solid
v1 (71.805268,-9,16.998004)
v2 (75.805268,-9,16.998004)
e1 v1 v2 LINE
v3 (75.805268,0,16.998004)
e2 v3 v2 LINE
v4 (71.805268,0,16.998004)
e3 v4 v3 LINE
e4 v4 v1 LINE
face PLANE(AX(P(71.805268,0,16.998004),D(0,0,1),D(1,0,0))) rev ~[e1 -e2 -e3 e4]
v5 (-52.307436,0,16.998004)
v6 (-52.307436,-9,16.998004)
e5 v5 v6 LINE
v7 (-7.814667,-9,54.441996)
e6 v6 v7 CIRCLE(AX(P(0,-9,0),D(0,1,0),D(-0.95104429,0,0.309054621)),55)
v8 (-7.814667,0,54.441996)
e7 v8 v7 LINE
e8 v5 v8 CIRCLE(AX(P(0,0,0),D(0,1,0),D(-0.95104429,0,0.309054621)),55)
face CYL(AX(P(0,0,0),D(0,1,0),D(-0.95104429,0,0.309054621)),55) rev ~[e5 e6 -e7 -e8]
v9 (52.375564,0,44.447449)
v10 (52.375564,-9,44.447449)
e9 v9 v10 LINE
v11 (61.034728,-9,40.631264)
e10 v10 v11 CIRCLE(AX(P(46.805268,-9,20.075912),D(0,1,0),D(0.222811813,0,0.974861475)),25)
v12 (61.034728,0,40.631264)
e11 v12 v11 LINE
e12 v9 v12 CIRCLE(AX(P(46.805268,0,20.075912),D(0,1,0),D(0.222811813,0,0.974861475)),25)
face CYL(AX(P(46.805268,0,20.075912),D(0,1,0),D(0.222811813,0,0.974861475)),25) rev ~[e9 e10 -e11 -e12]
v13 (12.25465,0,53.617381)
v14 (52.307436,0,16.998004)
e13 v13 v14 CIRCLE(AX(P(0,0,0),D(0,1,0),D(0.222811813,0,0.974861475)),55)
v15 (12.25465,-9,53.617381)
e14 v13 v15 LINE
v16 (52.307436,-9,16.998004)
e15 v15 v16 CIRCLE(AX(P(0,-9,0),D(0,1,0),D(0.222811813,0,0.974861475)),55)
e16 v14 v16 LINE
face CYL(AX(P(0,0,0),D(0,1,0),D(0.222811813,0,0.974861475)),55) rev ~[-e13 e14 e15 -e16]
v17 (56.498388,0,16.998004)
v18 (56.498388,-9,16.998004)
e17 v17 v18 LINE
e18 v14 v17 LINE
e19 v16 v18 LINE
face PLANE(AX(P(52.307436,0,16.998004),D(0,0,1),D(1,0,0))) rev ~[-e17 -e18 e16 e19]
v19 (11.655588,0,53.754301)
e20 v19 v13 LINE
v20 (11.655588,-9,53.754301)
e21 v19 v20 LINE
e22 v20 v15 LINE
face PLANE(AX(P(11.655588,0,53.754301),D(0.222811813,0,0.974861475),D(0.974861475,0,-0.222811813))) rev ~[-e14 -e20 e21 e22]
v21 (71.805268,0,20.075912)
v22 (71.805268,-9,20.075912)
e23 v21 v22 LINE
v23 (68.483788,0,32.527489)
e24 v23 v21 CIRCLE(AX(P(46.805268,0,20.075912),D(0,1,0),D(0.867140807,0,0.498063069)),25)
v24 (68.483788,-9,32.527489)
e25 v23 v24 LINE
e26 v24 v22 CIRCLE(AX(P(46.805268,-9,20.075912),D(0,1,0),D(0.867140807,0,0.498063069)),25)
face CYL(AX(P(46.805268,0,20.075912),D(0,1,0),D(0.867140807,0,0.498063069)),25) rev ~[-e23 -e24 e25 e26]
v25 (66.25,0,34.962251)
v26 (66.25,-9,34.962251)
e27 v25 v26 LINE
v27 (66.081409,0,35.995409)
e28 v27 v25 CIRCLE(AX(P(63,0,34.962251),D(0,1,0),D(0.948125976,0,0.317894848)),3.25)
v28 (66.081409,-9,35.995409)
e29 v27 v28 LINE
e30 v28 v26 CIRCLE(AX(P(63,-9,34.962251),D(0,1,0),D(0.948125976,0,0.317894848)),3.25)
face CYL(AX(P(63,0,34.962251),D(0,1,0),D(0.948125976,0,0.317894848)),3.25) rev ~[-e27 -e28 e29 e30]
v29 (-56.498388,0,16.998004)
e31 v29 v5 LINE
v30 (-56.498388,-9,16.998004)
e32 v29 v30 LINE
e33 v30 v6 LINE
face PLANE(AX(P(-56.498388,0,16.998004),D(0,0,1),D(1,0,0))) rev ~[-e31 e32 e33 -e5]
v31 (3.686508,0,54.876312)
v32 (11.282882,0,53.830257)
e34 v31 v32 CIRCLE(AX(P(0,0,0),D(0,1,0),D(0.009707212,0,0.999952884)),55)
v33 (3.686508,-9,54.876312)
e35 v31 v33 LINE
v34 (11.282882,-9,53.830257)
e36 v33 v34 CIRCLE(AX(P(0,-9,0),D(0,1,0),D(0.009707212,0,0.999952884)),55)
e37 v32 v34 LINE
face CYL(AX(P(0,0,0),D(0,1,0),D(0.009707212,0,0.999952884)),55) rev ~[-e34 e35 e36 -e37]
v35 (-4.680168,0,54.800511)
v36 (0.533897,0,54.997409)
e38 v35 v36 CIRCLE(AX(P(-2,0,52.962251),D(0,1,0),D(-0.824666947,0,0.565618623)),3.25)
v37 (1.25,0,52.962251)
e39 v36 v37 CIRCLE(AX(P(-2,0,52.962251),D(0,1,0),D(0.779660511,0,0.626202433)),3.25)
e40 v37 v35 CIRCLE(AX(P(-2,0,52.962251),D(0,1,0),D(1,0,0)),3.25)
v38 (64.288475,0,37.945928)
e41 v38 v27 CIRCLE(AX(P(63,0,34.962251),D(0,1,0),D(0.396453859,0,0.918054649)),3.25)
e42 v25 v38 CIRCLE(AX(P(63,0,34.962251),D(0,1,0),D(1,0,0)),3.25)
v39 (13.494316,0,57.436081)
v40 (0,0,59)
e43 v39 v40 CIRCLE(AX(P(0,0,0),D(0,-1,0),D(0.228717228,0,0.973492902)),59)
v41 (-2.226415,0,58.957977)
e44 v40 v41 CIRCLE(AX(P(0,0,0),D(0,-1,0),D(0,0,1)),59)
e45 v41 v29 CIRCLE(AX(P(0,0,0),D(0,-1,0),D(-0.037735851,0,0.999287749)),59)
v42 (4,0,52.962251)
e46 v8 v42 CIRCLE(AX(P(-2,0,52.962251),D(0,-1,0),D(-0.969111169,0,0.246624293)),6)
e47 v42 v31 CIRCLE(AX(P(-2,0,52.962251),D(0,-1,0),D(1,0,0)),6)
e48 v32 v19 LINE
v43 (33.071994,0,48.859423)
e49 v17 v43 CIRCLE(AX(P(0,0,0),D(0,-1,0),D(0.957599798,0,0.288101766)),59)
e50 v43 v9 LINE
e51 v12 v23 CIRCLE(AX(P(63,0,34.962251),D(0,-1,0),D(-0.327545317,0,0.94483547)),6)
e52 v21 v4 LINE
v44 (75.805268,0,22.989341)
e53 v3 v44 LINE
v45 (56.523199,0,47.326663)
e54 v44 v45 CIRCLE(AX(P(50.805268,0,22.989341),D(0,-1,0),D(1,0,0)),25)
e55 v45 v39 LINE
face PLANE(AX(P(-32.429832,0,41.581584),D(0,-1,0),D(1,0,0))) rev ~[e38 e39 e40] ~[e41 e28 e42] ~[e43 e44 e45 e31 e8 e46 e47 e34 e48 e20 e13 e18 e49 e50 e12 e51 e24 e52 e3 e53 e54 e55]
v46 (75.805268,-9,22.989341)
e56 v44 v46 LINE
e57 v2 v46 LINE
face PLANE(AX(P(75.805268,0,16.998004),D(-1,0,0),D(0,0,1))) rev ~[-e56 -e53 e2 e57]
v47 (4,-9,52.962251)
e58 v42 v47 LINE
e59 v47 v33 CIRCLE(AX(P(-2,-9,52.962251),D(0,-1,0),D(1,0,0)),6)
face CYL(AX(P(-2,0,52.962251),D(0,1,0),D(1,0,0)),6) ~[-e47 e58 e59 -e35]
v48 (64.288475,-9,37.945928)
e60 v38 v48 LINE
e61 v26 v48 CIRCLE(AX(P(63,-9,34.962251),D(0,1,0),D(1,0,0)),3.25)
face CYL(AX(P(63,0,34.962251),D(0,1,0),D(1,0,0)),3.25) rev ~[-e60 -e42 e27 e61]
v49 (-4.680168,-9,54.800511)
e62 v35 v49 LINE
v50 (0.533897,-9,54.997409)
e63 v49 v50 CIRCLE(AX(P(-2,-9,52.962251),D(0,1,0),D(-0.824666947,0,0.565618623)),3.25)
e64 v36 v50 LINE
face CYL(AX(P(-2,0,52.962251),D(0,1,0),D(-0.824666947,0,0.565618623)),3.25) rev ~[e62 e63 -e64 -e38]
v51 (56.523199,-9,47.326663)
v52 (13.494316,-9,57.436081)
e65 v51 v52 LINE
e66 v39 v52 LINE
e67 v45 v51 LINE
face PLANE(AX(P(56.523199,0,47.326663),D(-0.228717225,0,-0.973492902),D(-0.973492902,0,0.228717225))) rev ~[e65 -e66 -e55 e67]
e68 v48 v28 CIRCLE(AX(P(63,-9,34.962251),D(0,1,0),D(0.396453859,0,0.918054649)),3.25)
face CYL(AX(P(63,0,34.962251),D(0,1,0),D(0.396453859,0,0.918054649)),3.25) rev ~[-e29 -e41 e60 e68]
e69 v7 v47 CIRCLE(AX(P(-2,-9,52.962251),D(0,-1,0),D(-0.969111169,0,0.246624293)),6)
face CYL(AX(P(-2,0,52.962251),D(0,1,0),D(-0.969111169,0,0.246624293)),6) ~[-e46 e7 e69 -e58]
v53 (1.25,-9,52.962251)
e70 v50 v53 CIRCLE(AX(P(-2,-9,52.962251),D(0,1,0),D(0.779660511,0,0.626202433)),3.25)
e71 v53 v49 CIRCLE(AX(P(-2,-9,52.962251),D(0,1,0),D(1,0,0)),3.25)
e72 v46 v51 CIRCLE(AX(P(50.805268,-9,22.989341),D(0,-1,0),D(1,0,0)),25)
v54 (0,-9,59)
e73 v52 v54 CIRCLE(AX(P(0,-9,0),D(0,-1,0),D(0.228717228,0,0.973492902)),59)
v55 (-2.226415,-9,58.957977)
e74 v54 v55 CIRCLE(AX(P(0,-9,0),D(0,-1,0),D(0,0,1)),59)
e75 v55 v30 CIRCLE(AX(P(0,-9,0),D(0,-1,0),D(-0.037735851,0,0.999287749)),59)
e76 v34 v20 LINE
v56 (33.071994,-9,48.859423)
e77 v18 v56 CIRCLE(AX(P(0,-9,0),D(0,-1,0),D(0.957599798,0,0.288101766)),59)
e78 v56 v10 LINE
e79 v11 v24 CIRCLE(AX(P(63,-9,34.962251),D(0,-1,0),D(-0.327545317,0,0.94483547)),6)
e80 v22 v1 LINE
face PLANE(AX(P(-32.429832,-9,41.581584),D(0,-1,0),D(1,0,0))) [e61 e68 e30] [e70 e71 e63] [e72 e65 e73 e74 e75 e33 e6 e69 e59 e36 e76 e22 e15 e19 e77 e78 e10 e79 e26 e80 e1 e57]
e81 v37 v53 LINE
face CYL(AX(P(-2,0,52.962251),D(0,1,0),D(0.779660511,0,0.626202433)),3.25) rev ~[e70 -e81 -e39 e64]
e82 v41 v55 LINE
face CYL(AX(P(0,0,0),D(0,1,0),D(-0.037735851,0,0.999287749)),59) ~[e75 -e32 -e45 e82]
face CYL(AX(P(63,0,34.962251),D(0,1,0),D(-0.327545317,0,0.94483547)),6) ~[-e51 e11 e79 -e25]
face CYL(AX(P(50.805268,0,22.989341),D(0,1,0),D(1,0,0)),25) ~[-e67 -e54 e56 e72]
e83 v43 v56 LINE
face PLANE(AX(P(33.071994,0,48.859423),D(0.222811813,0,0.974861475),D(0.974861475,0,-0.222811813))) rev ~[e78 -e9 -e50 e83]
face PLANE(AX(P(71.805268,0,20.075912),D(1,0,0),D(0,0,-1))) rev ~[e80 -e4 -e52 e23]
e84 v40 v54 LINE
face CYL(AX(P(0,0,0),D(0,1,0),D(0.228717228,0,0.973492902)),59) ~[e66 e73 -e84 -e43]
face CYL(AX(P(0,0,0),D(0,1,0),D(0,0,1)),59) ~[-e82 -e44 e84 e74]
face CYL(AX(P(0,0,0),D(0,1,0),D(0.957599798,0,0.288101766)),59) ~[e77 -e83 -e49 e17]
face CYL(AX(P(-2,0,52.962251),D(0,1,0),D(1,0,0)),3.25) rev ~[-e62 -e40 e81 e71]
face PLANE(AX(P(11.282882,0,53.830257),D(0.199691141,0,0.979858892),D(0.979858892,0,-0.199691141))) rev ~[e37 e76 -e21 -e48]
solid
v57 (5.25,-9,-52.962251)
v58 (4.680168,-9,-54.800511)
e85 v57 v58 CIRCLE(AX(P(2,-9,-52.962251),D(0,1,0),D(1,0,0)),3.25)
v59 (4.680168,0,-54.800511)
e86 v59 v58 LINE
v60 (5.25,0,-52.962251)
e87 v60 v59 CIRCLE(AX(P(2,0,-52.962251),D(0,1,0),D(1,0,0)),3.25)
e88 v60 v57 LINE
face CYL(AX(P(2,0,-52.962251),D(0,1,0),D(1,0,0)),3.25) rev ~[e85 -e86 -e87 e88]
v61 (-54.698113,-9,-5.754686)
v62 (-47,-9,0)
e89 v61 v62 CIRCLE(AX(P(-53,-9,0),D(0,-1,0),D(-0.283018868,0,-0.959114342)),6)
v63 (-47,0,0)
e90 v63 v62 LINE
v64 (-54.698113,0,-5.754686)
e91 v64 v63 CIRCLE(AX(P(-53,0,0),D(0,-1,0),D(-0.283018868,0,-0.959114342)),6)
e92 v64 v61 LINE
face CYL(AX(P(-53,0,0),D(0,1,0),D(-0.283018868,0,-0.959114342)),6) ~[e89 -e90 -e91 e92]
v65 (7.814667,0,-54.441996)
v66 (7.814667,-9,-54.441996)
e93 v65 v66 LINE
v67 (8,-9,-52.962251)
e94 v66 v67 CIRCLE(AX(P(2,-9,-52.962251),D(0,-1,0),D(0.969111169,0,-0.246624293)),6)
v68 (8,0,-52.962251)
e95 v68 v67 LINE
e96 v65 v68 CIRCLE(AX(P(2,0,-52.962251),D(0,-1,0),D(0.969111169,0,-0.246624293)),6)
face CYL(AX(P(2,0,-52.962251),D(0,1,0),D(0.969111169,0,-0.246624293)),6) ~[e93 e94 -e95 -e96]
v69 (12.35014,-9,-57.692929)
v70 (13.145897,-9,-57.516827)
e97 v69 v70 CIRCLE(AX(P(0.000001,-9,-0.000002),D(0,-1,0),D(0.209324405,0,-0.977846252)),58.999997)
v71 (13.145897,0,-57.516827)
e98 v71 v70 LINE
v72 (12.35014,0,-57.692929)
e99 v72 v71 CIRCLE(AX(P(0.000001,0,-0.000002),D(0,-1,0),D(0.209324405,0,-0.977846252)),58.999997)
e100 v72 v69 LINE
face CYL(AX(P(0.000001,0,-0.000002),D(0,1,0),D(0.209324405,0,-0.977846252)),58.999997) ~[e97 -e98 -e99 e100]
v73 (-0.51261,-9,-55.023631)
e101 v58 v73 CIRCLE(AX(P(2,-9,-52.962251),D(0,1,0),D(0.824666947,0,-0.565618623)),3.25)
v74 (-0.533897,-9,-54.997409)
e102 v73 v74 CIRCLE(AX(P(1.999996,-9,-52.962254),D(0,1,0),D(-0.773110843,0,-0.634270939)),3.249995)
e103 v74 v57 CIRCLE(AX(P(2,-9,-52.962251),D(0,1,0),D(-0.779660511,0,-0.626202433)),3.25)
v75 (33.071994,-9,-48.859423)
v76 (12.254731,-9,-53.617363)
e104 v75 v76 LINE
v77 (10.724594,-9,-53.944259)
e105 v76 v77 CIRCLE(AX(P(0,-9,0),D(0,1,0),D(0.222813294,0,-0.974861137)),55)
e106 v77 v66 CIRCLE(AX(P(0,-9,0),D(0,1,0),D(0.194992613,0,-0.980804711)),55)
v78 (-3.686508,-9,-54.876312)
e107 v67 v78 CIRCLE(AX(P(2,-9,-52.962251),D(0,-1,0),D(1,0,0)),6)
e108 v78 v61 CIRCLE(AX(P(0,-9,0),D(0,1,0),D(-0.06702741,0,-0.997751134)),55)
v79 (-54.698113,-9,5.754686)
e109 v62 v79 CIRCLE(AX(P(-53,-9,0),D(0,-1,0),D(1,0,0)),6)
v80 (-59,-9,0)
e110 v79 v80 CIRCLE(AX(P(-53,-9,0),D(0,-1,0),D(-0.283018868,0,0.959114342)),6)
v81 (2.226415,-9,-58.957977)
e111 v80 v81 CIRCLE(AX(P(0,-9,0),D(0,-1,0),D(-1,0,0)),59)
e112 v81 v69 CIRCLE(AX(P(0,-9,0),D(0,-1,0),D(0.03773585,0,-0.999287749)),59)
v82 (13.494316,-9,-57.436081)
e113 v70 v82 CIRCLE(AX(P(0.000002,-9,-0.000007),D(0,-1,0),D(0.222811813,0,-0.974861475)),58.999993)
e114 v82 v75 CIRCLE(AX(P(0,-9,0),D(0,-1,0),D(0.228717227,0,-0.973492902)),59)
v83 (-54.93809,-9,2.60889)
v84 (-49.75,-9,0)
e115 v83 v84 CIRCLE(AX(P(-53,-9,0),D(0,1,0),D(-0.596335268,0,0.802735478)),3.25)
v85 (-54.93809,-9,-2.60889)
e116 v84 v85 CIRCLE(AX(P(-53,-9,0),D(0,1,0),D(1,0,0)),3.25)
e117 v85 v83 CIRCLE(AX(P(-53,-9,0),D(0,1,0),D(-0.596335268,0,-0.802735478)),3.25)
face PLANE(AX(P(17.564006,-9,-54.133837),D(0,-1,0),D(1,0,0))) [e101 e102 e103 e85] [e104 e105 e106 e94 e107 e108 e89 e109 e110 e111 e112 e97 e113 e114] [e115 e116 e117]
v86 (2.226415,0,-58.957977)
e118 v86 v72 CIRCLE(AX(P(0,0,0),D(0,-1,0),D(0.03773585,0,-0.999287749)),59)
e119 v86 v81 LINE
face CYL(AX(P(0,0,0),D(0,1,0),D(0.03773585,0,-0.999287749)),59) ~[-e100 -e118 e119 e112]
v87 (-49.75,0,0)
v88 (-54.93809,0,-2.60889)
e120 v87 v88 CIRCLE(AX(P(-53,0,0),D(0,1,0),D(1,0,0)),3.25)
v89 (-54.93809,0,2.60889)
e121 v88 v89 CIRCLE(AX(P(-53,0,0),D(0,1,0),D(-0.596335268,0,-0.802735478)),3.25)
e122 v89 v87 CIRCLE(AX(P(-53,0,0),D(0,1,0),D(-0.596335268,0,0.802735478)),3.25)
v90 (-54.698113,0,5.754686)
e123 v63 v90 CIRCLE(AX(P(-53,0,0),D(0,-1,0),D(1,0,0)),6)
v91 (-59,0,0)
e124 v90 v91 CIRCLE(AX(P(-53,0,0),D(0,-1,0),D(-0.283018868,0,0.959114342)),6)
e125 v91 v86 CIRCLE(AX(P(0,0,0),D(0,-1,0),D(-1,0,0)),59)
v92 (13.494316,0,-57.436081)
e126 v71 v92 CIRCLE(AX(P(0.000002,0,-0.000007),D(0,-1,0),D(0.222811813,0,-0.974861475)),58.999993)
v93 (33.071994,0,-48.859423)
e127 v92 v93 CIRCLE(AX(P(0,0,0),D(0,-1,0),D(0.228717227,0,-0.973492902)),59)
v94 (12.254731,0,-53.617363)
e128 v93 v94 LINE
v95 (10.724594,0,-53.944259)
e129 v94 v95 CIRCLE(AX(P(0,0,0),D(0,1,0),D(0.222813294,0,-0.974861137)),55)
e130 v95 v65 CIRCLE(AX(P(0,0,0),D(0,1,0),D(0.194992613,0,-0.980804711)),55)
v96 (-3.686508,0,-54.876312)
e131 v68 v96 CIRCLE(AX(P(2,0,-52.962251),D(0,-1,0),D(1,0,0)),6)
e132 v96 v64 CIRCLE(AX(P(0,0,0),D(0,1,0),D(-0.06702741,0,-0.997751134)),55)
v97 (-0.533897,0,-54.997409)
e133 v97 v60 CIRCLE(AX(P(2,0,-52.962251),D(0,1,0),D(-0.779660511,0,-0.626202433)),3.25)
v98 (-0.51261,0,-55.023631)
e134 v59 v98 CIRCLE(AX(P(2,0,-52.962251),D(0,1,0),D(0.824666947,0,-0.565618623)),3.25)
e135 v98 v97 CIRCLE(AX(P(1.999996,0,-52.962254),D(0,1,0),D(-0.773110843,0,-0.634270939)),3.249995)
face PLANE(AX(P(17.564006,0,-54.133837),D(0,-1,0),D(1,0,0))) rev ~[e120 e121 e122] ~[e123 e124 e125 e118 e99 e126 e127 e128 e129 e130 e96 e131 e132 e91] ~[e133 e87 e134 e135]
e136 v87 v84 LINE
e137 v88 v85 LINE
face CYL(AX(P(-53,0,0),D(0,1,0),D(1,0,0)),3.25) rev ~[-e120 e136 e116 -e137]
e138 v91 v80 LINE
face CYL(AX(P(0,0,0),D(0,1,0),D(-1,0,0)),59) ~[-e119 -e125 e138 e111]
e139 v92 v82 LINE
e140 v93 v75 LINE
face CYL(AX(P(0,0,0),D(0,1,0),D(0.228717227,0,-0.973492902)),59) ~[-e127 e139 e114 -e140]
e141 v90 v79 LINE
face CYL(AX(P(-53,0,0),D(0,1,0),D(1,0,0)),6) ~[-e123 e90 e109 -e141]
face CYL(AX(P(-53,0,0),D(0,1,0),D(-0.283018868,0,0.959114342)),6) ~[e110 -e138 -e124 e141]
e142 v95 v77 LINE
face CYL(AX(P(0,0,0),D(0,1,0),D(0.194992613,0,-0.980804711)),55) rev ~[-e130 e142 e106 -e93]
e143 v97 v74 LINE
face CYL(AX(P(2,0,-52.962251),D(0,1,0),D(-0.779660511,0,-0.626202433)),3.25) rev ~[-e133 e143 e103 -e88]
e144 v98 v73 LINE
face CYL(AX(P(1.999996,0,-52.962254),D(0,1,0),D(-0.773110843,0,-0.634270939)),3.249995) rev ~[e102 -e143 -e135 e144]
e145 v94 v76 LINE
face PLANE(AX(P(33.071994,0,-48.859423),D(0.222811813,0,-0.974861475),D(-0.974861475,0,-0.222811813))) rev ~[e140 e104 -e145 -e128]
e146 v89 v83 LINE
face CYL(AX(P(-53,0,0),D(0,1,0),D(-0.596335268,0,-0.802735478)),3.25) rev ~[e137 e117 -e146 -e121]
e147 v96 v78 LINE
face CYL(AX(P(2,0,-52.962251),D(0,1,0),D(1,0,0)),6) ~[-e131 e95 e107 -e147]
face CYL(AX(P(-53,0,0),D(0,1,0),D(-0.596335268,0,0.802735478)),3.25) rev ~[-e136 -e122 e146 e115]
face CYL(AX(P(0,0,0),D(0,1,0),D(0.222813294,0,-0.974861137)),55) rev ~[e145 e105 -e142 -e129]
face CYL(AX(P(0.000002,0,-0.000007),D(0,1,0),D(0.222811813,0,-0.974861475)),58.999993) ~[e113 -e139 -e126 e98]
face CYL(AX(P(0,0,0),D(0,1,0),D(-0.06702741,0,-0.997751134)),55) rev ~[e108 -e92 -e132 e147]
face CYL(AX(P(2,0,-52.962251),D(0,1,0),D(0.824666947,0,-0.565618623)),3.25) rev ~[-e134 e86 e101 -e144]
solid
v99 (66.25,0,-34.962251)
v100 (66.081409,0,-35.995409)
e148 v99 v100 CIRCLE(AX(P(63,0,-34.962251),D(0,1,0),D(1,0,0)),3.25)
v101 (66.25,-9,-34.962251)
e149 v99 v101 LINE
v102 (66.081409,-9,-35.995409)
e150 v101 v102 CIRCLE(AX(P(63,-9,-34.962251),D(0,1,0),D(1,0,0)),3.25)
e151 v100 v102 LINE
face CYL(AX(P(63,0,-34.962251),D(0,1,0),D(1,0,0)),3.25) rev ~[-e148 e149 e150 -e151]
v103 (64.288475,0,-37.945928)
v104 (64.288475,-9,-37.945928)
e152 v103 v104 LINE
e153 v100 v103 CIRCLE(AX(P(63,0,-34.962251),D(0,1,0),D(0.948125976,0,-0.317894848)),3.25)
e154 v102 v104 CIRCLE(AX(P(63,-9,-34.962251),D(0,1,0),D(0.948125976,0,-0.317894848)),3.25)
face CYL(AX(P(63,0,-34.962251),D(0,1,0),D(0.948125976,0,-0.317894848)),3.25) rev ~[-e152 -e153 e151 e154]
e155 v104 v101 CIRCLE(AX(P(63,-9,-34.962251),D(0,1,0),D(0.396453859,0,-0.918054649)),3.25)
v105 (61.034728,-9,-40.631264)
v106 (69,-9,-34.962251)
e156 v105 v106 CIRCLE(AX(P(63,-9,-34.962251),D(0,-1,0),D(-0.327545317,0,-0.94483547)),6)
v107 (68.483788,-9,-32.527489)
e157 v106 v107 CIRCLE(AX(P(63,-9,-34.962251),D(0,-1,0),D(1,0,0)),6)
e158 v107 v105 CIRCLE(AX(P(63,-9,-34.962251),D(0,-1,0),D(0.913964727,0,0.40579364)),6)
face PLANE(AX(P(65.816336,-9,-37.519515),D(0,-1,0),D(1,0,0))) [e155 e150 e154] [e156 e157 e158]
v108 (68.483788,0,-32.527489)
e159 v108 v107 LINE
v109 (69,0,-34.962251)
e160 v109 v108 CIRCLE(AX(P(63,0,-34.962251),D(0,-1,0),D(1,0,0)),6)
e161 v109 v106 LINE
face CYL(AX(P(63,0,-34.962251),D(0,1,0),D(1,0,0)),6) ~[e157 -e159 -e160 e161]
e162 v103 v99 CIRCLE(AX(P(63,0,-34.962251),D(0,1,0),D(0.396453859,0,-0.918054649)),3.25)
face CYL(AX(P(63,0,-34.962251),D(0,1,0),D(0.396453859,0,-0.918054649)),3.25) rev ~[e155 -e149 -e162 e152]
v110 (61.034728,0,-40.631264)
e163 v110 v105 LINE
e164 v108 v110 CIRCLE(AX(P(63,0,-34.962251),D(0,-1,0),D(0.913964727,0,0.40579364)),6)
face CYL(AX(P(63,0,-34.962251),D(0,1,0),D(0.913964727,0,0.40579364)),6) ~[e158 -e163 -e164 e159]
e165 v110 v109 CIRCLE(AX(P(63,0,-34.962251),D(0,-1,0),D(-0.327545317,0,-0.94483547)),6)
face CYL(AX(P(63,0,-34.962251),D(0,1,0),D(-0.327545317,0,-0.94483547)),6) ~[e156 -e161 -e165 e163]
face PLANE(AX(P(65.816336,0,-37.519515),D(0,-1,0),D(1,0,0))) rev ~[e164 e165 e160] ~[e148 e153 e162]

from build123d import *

# Parameters (mm, degrees)
F1_DEPTH = 9


# Not quite as in the source:
# - a feature names something its author has since deleted; it is built from what else it names


with BuildPart() as f1:
    # F0 (on Front) → F1 (new body)
    with BuildSketch(Plane.XZ):
        with BuildLine():
            ThreePointArc((2.2264151739, -58.9579771996), (7.3156733339, -58.544691678), (12.3501399093, -57.6929288927))
            ThreePointArc((12.3501399093, -57.6929288927), (12.7483225231, -57.6062520292), (13.1458969739, -57.51682704))
            ThreePointArc((13.1458969739, -57.51682704), (13.3201678722, -57.4767181375), (13.4943164015, -57.4360812108))
            ThreePointArc((13.4943164015, -57.4360812108), (23.6747774831, -54.0416960423), (33.0719942338, -48.8594228108))
            Line((33.0719942338, -48.8594228108), (12.2547311497, -53.617362528))
            ThreePointArc((12.2547311497, -53.6173625279), (11.4908249672, -53.7862523474), (10.724593739, -53.9442590934))
            ThreePointArc((10.724593739, -53.9442590934), (9.2729705564, -54.2126555064), (7.8146670139, -54.4419964684))
            ThreePointArc((7.8146670139, -54.4419964684), (5.7712317605, -57.6289209346), (2.2264151739, -58.9579771996))
        make_face()
        with BuildLine():
            ThreePointArc((-59, 0), (-40.9245739425, -42.499167611), (2.2264151739, -58.9579771996))
            ThreePointArc((2.2264151739, -58.9579771996), (-1.4085405992, -57.9000488994), (-3.6865075266, -54.8763123967))
            ThreePointArc((-3.6865075266, -54.8763123967), (-38.1500265832, -39.6178680862), (-54.6981132075, -5.75468605))
            ThreePointArc((-54.6981132075, -5.75468605), (-57.8056570438, -3.5924449025), (-59, 0))
        make_face()
        with BuildLine():
            ThreePointArc((-3.6865075266, -54.8763123967), (-1.4085405992, -57.9000488994), (2.2264151739, -58.9579771996))
            ThreePointArc((2.2264151739, -58.9579771996), (5.7712317605, -57.6289209346), (7.8146670139, -54.4419964684))
            ThreePointArc((7.8146670139, -54.4419964684), (6.2499884856, -54.643733803), (4.6801675765, -54.8005112335))
            ThreePointArc((4.6801675765, -54.8005112335), (2.1395152245, -56.2092547885), (-0.5126102579, -55.023631238))
            ThreePointArc((-0.5126102579, -55.023631238), (-0.523287524, -55.0105475784), (-0.5338966616, -54.9974086149))
            ThreePointArc((-0.5338966616, -54.9974086149), (-2.11107057, -54.9594703491), (-3.6865075266, -54.8763123967))
        make_face()
        with BuildLine():
            ThreePointArc((-54.6981132075, 5.75468605), (-57.8056570438, 3.5924449025), (-59, 0))
            ThreePointArc((-59, 0), (-57.8056570438, -3.5924449025), (-54.6981132075, -5.75468605))
            ThreePointArc((-54.6981132075, -5.75468605), (-54.8406623818, -4.1835092356), (-54.9380896226, -2.6088903033))
            ThreePointArc((-54.9380896226, -2.6088903033), (-56.25, 0), (-54.9380896226, 2.6088903033))
            ThreePointArc((-54.9380896226, 2.6088903033), (-54.8406623818, 4.1835092356), (-54.6981132075, 5.75468605))
        make_face()
        with BuildLine():
            ThreePointArc((8, -52.9622507075), (1.0302178491, -47.0411424852), (-3.6865075266, -54.8763123967))
            ThreePointArc((-3.6865075266, -54.8763123967), (-2.11107057, -54.9594703491), (-0.5338966616, -54.9974086149))
            ThreePointArc((-0.5338966616, -54.9974086149), (0.9212655911, -49.8964992376), (5.25, -52.9622507075))
            ThreePointArc((5.25, -52.9622507075), (5.1042748448, -53.9245280522), (4.6801675765, -54.8005112335))
            ThreePointArc((4.6801675765, -54.8005112335), (6.2499884856, -54.643733803), (7.8146670139, -54.4419964684))
            ThreePointArc((7.8146670139, -54.4419964684), (7.953486461, -53.7079040841), (8, -52.9622507075))
        make_face()
        with BuildLine():
            ThreePointArc((-47, 0), (-49.4075550975, 4.8056570438), (-54.6981132075, 5.75468605))
            ThreePointArc((-54.6981132075, 5.75468605), (-54.8406623818, 4.1835092356), (-54.9380896226, 2.6088903033))
            ThreePointArc((-54.9380896226, 2.6088903033), (-51.5399128919, 2.9035574106), (-49.75, 0))
            ThreePointArc((-49.75, 0), (-51.5399128919, -2.9035574106), (-54.9380896226, -2.6088903033))
            ThreePointArc((-54.9380896226, -2.6088903033), (-54.8406623818, -4.1835092356), (-54.6981132075, -5.75468605))
            ThreePointArc((-54.6981132075, -5.75468605), (-49.4075550975, -4.8056570438), (-47, 0))
        make_face()
    extrude(amount=F1_DEPTH)


with BuildPart() as f1b:
    # F0 (on Front) → F1, piece 2 (new body)
    with BuildSketch(Plane.XZ):
        with BuildLine():
            ThreePointArc((-2.2264152072, 58.9579771984), (-36.0875389034, 46.6764344814), (-56.4983880681, 16.9980041683))
            Line((-56.4983880681, 16.9980041683), (-52.3074359369, 16.9980041683))
            ThreePointArc((-52.3074359369, 16.9980041683), (-35.4144032231, 42.0811126795), (-7.8146670139, 54.4419964684))
            ThreePointArc((-7.8146670139, 54.4419964684), (-5.7712317735, 57.6289209241), (-2.2264152072, 58.9579771984))
        make_face()
        with BuildLine():
            ThreePointArc((0, 59), (-1.1134058773, 58.9894933641), (-2.2264152072, 58.9579771984))
            ThreePointArc((-2.2264152072, 58.9579771984), (1.4085405854, 57.9000489088), (3.6865075266, 54.8763123967))
            ThreePointArc((3.6865075266, 54.8763123967), (7.5029468578, 54.4858310797), (11.2828817239, 53.8302571051))
            Line((11.2828817239, 53.8302571051), (11.6555883217, 53.7543010605))
            Line((11.6555883217, 53.7543010605), (12.2546497214, 53.617381139))
            Line((12.2546497214, 53.617381139), (33.0719942338, 48.8594228108))
            ThreePointArc((33.0719942338, 48.8594228108), (23.6747775211, 54.0416960256), (13.4943164822, 57.4360811919))
            ThreePointArc((13.4943164822, 57.4360811919), (6.7923195479, 58.6077161742), (0, 59))
        make_face()
        with BuildLine():
            ThreePointArc((3.6865075266, 54.8763123967), (1.4085405854, 57.9000489088), (-2.2264152072, 58.9579771984))
            ThreePointArc((-2.2264152072, 58.9579771984), (-5.7712317735, 57.6289209241), (-7.8146670139, 54.4419964684))
            ThreePointArc((-7.8146670139, 54.4419964684), (-6.2499884856, 54.643733803), (-4.6801675765, 54.8005112335))
            ThreePointArc((-4.6801675765, 54.8005112335), (-2.1226415094, 56.2099358924), (0.5338966616, 54.9974086149))
            ThreePointArc((0.5338966616, 54.9974086149), (2.11107057, 54.9594703491), (3.6865075266, 54.8763123967))
        make_face()
        with BuildLine():
            Line((52.3074359369, 16.9980041683), (56.4983880681, 16.9980041683))
            ThreePointArc((56.4983880681, 16.9980041683), (47.5342071135, 34.9499521329), (33.0719942338, 48.8594228108))
            Line((33.0719942338, 48.8594228108), (12.2546497214, 53.617381139))
            ThreePointArc((12.2546497214, 53.617381139), (37.1121330372, 40.591742774), (52.3074359369, 16.9980041683))
        make_face()
        with BuildLine():
            ThreePointArc((4, 52.9622507075), (3.9211082223, 53.9320328584), (3.6865075266, 54.8763123967))
            ThreePointArc((3.6865075266, 54.8763123967), (2.11107057, 54.9594703491), (0.5338966616, 54.9974086149))
            ThreePointArc((0.5338966616, 54.9974086149), (1.0657514699, 54.0409851163), (1.25, 52.9622507075))
            ThreePointArc((1.25, 52.9622507075), (-2.9622773447, 49.8579758627), (-4.6801675765, 54.8005112335))
            ThreePointArc((-4.6801675765, 54.8005112335), (-6.2499884856, 54.643733803), (-7.8146670139, 54.4419964684))
            ThreePointArc((-7.8146670139, 54.4419964684), (-2.7456533767, 47.0087642464), (4, 52.9622507075))
        make_face()
        with BuildLine():
            ThreePointArc((13.4943164822, 57.4360811919), (23.6747775211, 54.0416960256), (33.0719942338, 48.8594228108))
            Line((33.0719942338, 48.8594228108), (52.3755635072, 44.4474490293))
            ThreePointArc((52.3755635072, 44.4474490293), (56.8873510456, 42.9527914166), (61.0347281001, 40.631263528))
            ThreePointArc((61.0347281001, 40.631263528), (66.4791068251, 39.8505853625), (69, 34.9622507075))
            ThreePointArc((69, 34.9622507075), (68.8695285228, 33.7178090977), (68.48378836, 32.5274888663))
            ThreePointArc((68.48378836, 32.5274888663), (70.9606299497, 26.5193970545), (71.8052681793, 20.0759121479))
            Line((71.8052681793, 20.0759121479), (71.8052681793, 16.9980041683))
            Line((71.8052681793, 16.9980041683), (75.8052681793, 16.9980041683))
            Line((75.8052681793, 16.9980041683), (75.8052681793, 22.9893407228))
            ThreePointArc((75.8052681793, 22.9893407228), (70.4005260997, 38.5143485177), (56.5231988167, 47.3266632794))
            Line((56.5231988167, 47.3266632794), (13.4943164822, 57.4360811919))
        make_face()
        with BuildLine():
            ThreePointArc((64.2884750409, 37.9459283155), (62.7183466029, 39.3573523193), (61.0347281001, 40.631263528))
            ThreePointArc((61.0347281001, 40.631263528), (58.5826727015, 30.901804976), (68.48378836, 32.5274888663))
            ThreePointArc((68.48378836, 32.5274888663), (67.3558810778, 34.3122146697), (66.0814094211, 35.9954089623))
            ThreePointArc((66.0814094211, 35.9954089623), (66.2075754565, 35.4856622957), (66.25, 34.9622507075))
            ThreePointArc((66.25, 34.9622507075), (60.2843008374, 33.1768997452), (64.2884750409, 37.9459283155))
        make_face()
        with BuildLine():
            ThreePointArc((69, 34.9622507075), (66.4791068251, 39.8505853625), (61.0347281001, 40.631263528))
            ThreePointArc((61.0347281001, 40.631263528), (62.7183466029, 39.3573523193), (64.2884750409, 37.9459283155))
            ThreePointArc((64.2884750409, 37.9459283155), (65.3927189533, 37.161658812), (66.0814094211, 35.9954089623))
            ThreePointArc((66.0814094211, 35.9954089623), (67.3558810778, 34.3122146697), (68.48378836, 32.5274888663))
            ThreePointArc((68.48378836, 32.5274888663), (68.8695285228, 33.7178090977), (69, 34.9622507075))
        make_face()
    extrude(amount=F1_DEPTH)


with BuildPart() as f1c:
    # F0 (on Front) → F1, piece 3 (new body)
    with BuildSketch(Plane.XZ):
        with BuildLine():
            ThreePointArc((64.2884750409, -37.9459283155), (62.7183466029, -39.3573523193), (61.0347281001, -40.631263528))
            ThreePointArc((61.0347281001, -40.631263528), (66.4791068251, -39.8505853625), (69, -34.9622507075))
            ThreePointArc((69, -34.9622507075), (68.8695285228, -33.7178090977), (68.48378836, -32.5274888663))
            ThreePointArc((68.48378836, -32.5274888663), (67.3558810778, -34.3122146697), (66.0814094211, -35.9954089623))
            ThreePointArc((66.0814094211, -35.9954089623), (65.3927189533, -37.161658812), (64.2884750409, -37.9459283155))
        make_face()
        with BuildLine():
            ThreePointArc((68.48378836, -32.5274888663), (58.5826727015, -30.901804976), (61.0347281001, -40.631263528))
            ThreePointArc((61.0347281001, -40.631263528), (62.7183466029, -39.3573523193), (64.2884750409, -37.9459283155))
            ThreePointArc((64.2884750409, -37.9459283155), (60.2843008374, -33.1768997452), (66.25, -34.9622507075))
            ThreePointArc((66.25, -34.9622507075), (66.2075754565, -35.4856622957), (66.0814094211, -35.9954089623))
            ThreePointArc((66.0814094211, -35.9954089623), (67.3558810778, -34.3122146697), (68.48378836, -32.5274888663))
        make_face()
    extrude(amount=F1_DEPTH)


solid = Compound([f1.part, f1b.part, f1c.part])
